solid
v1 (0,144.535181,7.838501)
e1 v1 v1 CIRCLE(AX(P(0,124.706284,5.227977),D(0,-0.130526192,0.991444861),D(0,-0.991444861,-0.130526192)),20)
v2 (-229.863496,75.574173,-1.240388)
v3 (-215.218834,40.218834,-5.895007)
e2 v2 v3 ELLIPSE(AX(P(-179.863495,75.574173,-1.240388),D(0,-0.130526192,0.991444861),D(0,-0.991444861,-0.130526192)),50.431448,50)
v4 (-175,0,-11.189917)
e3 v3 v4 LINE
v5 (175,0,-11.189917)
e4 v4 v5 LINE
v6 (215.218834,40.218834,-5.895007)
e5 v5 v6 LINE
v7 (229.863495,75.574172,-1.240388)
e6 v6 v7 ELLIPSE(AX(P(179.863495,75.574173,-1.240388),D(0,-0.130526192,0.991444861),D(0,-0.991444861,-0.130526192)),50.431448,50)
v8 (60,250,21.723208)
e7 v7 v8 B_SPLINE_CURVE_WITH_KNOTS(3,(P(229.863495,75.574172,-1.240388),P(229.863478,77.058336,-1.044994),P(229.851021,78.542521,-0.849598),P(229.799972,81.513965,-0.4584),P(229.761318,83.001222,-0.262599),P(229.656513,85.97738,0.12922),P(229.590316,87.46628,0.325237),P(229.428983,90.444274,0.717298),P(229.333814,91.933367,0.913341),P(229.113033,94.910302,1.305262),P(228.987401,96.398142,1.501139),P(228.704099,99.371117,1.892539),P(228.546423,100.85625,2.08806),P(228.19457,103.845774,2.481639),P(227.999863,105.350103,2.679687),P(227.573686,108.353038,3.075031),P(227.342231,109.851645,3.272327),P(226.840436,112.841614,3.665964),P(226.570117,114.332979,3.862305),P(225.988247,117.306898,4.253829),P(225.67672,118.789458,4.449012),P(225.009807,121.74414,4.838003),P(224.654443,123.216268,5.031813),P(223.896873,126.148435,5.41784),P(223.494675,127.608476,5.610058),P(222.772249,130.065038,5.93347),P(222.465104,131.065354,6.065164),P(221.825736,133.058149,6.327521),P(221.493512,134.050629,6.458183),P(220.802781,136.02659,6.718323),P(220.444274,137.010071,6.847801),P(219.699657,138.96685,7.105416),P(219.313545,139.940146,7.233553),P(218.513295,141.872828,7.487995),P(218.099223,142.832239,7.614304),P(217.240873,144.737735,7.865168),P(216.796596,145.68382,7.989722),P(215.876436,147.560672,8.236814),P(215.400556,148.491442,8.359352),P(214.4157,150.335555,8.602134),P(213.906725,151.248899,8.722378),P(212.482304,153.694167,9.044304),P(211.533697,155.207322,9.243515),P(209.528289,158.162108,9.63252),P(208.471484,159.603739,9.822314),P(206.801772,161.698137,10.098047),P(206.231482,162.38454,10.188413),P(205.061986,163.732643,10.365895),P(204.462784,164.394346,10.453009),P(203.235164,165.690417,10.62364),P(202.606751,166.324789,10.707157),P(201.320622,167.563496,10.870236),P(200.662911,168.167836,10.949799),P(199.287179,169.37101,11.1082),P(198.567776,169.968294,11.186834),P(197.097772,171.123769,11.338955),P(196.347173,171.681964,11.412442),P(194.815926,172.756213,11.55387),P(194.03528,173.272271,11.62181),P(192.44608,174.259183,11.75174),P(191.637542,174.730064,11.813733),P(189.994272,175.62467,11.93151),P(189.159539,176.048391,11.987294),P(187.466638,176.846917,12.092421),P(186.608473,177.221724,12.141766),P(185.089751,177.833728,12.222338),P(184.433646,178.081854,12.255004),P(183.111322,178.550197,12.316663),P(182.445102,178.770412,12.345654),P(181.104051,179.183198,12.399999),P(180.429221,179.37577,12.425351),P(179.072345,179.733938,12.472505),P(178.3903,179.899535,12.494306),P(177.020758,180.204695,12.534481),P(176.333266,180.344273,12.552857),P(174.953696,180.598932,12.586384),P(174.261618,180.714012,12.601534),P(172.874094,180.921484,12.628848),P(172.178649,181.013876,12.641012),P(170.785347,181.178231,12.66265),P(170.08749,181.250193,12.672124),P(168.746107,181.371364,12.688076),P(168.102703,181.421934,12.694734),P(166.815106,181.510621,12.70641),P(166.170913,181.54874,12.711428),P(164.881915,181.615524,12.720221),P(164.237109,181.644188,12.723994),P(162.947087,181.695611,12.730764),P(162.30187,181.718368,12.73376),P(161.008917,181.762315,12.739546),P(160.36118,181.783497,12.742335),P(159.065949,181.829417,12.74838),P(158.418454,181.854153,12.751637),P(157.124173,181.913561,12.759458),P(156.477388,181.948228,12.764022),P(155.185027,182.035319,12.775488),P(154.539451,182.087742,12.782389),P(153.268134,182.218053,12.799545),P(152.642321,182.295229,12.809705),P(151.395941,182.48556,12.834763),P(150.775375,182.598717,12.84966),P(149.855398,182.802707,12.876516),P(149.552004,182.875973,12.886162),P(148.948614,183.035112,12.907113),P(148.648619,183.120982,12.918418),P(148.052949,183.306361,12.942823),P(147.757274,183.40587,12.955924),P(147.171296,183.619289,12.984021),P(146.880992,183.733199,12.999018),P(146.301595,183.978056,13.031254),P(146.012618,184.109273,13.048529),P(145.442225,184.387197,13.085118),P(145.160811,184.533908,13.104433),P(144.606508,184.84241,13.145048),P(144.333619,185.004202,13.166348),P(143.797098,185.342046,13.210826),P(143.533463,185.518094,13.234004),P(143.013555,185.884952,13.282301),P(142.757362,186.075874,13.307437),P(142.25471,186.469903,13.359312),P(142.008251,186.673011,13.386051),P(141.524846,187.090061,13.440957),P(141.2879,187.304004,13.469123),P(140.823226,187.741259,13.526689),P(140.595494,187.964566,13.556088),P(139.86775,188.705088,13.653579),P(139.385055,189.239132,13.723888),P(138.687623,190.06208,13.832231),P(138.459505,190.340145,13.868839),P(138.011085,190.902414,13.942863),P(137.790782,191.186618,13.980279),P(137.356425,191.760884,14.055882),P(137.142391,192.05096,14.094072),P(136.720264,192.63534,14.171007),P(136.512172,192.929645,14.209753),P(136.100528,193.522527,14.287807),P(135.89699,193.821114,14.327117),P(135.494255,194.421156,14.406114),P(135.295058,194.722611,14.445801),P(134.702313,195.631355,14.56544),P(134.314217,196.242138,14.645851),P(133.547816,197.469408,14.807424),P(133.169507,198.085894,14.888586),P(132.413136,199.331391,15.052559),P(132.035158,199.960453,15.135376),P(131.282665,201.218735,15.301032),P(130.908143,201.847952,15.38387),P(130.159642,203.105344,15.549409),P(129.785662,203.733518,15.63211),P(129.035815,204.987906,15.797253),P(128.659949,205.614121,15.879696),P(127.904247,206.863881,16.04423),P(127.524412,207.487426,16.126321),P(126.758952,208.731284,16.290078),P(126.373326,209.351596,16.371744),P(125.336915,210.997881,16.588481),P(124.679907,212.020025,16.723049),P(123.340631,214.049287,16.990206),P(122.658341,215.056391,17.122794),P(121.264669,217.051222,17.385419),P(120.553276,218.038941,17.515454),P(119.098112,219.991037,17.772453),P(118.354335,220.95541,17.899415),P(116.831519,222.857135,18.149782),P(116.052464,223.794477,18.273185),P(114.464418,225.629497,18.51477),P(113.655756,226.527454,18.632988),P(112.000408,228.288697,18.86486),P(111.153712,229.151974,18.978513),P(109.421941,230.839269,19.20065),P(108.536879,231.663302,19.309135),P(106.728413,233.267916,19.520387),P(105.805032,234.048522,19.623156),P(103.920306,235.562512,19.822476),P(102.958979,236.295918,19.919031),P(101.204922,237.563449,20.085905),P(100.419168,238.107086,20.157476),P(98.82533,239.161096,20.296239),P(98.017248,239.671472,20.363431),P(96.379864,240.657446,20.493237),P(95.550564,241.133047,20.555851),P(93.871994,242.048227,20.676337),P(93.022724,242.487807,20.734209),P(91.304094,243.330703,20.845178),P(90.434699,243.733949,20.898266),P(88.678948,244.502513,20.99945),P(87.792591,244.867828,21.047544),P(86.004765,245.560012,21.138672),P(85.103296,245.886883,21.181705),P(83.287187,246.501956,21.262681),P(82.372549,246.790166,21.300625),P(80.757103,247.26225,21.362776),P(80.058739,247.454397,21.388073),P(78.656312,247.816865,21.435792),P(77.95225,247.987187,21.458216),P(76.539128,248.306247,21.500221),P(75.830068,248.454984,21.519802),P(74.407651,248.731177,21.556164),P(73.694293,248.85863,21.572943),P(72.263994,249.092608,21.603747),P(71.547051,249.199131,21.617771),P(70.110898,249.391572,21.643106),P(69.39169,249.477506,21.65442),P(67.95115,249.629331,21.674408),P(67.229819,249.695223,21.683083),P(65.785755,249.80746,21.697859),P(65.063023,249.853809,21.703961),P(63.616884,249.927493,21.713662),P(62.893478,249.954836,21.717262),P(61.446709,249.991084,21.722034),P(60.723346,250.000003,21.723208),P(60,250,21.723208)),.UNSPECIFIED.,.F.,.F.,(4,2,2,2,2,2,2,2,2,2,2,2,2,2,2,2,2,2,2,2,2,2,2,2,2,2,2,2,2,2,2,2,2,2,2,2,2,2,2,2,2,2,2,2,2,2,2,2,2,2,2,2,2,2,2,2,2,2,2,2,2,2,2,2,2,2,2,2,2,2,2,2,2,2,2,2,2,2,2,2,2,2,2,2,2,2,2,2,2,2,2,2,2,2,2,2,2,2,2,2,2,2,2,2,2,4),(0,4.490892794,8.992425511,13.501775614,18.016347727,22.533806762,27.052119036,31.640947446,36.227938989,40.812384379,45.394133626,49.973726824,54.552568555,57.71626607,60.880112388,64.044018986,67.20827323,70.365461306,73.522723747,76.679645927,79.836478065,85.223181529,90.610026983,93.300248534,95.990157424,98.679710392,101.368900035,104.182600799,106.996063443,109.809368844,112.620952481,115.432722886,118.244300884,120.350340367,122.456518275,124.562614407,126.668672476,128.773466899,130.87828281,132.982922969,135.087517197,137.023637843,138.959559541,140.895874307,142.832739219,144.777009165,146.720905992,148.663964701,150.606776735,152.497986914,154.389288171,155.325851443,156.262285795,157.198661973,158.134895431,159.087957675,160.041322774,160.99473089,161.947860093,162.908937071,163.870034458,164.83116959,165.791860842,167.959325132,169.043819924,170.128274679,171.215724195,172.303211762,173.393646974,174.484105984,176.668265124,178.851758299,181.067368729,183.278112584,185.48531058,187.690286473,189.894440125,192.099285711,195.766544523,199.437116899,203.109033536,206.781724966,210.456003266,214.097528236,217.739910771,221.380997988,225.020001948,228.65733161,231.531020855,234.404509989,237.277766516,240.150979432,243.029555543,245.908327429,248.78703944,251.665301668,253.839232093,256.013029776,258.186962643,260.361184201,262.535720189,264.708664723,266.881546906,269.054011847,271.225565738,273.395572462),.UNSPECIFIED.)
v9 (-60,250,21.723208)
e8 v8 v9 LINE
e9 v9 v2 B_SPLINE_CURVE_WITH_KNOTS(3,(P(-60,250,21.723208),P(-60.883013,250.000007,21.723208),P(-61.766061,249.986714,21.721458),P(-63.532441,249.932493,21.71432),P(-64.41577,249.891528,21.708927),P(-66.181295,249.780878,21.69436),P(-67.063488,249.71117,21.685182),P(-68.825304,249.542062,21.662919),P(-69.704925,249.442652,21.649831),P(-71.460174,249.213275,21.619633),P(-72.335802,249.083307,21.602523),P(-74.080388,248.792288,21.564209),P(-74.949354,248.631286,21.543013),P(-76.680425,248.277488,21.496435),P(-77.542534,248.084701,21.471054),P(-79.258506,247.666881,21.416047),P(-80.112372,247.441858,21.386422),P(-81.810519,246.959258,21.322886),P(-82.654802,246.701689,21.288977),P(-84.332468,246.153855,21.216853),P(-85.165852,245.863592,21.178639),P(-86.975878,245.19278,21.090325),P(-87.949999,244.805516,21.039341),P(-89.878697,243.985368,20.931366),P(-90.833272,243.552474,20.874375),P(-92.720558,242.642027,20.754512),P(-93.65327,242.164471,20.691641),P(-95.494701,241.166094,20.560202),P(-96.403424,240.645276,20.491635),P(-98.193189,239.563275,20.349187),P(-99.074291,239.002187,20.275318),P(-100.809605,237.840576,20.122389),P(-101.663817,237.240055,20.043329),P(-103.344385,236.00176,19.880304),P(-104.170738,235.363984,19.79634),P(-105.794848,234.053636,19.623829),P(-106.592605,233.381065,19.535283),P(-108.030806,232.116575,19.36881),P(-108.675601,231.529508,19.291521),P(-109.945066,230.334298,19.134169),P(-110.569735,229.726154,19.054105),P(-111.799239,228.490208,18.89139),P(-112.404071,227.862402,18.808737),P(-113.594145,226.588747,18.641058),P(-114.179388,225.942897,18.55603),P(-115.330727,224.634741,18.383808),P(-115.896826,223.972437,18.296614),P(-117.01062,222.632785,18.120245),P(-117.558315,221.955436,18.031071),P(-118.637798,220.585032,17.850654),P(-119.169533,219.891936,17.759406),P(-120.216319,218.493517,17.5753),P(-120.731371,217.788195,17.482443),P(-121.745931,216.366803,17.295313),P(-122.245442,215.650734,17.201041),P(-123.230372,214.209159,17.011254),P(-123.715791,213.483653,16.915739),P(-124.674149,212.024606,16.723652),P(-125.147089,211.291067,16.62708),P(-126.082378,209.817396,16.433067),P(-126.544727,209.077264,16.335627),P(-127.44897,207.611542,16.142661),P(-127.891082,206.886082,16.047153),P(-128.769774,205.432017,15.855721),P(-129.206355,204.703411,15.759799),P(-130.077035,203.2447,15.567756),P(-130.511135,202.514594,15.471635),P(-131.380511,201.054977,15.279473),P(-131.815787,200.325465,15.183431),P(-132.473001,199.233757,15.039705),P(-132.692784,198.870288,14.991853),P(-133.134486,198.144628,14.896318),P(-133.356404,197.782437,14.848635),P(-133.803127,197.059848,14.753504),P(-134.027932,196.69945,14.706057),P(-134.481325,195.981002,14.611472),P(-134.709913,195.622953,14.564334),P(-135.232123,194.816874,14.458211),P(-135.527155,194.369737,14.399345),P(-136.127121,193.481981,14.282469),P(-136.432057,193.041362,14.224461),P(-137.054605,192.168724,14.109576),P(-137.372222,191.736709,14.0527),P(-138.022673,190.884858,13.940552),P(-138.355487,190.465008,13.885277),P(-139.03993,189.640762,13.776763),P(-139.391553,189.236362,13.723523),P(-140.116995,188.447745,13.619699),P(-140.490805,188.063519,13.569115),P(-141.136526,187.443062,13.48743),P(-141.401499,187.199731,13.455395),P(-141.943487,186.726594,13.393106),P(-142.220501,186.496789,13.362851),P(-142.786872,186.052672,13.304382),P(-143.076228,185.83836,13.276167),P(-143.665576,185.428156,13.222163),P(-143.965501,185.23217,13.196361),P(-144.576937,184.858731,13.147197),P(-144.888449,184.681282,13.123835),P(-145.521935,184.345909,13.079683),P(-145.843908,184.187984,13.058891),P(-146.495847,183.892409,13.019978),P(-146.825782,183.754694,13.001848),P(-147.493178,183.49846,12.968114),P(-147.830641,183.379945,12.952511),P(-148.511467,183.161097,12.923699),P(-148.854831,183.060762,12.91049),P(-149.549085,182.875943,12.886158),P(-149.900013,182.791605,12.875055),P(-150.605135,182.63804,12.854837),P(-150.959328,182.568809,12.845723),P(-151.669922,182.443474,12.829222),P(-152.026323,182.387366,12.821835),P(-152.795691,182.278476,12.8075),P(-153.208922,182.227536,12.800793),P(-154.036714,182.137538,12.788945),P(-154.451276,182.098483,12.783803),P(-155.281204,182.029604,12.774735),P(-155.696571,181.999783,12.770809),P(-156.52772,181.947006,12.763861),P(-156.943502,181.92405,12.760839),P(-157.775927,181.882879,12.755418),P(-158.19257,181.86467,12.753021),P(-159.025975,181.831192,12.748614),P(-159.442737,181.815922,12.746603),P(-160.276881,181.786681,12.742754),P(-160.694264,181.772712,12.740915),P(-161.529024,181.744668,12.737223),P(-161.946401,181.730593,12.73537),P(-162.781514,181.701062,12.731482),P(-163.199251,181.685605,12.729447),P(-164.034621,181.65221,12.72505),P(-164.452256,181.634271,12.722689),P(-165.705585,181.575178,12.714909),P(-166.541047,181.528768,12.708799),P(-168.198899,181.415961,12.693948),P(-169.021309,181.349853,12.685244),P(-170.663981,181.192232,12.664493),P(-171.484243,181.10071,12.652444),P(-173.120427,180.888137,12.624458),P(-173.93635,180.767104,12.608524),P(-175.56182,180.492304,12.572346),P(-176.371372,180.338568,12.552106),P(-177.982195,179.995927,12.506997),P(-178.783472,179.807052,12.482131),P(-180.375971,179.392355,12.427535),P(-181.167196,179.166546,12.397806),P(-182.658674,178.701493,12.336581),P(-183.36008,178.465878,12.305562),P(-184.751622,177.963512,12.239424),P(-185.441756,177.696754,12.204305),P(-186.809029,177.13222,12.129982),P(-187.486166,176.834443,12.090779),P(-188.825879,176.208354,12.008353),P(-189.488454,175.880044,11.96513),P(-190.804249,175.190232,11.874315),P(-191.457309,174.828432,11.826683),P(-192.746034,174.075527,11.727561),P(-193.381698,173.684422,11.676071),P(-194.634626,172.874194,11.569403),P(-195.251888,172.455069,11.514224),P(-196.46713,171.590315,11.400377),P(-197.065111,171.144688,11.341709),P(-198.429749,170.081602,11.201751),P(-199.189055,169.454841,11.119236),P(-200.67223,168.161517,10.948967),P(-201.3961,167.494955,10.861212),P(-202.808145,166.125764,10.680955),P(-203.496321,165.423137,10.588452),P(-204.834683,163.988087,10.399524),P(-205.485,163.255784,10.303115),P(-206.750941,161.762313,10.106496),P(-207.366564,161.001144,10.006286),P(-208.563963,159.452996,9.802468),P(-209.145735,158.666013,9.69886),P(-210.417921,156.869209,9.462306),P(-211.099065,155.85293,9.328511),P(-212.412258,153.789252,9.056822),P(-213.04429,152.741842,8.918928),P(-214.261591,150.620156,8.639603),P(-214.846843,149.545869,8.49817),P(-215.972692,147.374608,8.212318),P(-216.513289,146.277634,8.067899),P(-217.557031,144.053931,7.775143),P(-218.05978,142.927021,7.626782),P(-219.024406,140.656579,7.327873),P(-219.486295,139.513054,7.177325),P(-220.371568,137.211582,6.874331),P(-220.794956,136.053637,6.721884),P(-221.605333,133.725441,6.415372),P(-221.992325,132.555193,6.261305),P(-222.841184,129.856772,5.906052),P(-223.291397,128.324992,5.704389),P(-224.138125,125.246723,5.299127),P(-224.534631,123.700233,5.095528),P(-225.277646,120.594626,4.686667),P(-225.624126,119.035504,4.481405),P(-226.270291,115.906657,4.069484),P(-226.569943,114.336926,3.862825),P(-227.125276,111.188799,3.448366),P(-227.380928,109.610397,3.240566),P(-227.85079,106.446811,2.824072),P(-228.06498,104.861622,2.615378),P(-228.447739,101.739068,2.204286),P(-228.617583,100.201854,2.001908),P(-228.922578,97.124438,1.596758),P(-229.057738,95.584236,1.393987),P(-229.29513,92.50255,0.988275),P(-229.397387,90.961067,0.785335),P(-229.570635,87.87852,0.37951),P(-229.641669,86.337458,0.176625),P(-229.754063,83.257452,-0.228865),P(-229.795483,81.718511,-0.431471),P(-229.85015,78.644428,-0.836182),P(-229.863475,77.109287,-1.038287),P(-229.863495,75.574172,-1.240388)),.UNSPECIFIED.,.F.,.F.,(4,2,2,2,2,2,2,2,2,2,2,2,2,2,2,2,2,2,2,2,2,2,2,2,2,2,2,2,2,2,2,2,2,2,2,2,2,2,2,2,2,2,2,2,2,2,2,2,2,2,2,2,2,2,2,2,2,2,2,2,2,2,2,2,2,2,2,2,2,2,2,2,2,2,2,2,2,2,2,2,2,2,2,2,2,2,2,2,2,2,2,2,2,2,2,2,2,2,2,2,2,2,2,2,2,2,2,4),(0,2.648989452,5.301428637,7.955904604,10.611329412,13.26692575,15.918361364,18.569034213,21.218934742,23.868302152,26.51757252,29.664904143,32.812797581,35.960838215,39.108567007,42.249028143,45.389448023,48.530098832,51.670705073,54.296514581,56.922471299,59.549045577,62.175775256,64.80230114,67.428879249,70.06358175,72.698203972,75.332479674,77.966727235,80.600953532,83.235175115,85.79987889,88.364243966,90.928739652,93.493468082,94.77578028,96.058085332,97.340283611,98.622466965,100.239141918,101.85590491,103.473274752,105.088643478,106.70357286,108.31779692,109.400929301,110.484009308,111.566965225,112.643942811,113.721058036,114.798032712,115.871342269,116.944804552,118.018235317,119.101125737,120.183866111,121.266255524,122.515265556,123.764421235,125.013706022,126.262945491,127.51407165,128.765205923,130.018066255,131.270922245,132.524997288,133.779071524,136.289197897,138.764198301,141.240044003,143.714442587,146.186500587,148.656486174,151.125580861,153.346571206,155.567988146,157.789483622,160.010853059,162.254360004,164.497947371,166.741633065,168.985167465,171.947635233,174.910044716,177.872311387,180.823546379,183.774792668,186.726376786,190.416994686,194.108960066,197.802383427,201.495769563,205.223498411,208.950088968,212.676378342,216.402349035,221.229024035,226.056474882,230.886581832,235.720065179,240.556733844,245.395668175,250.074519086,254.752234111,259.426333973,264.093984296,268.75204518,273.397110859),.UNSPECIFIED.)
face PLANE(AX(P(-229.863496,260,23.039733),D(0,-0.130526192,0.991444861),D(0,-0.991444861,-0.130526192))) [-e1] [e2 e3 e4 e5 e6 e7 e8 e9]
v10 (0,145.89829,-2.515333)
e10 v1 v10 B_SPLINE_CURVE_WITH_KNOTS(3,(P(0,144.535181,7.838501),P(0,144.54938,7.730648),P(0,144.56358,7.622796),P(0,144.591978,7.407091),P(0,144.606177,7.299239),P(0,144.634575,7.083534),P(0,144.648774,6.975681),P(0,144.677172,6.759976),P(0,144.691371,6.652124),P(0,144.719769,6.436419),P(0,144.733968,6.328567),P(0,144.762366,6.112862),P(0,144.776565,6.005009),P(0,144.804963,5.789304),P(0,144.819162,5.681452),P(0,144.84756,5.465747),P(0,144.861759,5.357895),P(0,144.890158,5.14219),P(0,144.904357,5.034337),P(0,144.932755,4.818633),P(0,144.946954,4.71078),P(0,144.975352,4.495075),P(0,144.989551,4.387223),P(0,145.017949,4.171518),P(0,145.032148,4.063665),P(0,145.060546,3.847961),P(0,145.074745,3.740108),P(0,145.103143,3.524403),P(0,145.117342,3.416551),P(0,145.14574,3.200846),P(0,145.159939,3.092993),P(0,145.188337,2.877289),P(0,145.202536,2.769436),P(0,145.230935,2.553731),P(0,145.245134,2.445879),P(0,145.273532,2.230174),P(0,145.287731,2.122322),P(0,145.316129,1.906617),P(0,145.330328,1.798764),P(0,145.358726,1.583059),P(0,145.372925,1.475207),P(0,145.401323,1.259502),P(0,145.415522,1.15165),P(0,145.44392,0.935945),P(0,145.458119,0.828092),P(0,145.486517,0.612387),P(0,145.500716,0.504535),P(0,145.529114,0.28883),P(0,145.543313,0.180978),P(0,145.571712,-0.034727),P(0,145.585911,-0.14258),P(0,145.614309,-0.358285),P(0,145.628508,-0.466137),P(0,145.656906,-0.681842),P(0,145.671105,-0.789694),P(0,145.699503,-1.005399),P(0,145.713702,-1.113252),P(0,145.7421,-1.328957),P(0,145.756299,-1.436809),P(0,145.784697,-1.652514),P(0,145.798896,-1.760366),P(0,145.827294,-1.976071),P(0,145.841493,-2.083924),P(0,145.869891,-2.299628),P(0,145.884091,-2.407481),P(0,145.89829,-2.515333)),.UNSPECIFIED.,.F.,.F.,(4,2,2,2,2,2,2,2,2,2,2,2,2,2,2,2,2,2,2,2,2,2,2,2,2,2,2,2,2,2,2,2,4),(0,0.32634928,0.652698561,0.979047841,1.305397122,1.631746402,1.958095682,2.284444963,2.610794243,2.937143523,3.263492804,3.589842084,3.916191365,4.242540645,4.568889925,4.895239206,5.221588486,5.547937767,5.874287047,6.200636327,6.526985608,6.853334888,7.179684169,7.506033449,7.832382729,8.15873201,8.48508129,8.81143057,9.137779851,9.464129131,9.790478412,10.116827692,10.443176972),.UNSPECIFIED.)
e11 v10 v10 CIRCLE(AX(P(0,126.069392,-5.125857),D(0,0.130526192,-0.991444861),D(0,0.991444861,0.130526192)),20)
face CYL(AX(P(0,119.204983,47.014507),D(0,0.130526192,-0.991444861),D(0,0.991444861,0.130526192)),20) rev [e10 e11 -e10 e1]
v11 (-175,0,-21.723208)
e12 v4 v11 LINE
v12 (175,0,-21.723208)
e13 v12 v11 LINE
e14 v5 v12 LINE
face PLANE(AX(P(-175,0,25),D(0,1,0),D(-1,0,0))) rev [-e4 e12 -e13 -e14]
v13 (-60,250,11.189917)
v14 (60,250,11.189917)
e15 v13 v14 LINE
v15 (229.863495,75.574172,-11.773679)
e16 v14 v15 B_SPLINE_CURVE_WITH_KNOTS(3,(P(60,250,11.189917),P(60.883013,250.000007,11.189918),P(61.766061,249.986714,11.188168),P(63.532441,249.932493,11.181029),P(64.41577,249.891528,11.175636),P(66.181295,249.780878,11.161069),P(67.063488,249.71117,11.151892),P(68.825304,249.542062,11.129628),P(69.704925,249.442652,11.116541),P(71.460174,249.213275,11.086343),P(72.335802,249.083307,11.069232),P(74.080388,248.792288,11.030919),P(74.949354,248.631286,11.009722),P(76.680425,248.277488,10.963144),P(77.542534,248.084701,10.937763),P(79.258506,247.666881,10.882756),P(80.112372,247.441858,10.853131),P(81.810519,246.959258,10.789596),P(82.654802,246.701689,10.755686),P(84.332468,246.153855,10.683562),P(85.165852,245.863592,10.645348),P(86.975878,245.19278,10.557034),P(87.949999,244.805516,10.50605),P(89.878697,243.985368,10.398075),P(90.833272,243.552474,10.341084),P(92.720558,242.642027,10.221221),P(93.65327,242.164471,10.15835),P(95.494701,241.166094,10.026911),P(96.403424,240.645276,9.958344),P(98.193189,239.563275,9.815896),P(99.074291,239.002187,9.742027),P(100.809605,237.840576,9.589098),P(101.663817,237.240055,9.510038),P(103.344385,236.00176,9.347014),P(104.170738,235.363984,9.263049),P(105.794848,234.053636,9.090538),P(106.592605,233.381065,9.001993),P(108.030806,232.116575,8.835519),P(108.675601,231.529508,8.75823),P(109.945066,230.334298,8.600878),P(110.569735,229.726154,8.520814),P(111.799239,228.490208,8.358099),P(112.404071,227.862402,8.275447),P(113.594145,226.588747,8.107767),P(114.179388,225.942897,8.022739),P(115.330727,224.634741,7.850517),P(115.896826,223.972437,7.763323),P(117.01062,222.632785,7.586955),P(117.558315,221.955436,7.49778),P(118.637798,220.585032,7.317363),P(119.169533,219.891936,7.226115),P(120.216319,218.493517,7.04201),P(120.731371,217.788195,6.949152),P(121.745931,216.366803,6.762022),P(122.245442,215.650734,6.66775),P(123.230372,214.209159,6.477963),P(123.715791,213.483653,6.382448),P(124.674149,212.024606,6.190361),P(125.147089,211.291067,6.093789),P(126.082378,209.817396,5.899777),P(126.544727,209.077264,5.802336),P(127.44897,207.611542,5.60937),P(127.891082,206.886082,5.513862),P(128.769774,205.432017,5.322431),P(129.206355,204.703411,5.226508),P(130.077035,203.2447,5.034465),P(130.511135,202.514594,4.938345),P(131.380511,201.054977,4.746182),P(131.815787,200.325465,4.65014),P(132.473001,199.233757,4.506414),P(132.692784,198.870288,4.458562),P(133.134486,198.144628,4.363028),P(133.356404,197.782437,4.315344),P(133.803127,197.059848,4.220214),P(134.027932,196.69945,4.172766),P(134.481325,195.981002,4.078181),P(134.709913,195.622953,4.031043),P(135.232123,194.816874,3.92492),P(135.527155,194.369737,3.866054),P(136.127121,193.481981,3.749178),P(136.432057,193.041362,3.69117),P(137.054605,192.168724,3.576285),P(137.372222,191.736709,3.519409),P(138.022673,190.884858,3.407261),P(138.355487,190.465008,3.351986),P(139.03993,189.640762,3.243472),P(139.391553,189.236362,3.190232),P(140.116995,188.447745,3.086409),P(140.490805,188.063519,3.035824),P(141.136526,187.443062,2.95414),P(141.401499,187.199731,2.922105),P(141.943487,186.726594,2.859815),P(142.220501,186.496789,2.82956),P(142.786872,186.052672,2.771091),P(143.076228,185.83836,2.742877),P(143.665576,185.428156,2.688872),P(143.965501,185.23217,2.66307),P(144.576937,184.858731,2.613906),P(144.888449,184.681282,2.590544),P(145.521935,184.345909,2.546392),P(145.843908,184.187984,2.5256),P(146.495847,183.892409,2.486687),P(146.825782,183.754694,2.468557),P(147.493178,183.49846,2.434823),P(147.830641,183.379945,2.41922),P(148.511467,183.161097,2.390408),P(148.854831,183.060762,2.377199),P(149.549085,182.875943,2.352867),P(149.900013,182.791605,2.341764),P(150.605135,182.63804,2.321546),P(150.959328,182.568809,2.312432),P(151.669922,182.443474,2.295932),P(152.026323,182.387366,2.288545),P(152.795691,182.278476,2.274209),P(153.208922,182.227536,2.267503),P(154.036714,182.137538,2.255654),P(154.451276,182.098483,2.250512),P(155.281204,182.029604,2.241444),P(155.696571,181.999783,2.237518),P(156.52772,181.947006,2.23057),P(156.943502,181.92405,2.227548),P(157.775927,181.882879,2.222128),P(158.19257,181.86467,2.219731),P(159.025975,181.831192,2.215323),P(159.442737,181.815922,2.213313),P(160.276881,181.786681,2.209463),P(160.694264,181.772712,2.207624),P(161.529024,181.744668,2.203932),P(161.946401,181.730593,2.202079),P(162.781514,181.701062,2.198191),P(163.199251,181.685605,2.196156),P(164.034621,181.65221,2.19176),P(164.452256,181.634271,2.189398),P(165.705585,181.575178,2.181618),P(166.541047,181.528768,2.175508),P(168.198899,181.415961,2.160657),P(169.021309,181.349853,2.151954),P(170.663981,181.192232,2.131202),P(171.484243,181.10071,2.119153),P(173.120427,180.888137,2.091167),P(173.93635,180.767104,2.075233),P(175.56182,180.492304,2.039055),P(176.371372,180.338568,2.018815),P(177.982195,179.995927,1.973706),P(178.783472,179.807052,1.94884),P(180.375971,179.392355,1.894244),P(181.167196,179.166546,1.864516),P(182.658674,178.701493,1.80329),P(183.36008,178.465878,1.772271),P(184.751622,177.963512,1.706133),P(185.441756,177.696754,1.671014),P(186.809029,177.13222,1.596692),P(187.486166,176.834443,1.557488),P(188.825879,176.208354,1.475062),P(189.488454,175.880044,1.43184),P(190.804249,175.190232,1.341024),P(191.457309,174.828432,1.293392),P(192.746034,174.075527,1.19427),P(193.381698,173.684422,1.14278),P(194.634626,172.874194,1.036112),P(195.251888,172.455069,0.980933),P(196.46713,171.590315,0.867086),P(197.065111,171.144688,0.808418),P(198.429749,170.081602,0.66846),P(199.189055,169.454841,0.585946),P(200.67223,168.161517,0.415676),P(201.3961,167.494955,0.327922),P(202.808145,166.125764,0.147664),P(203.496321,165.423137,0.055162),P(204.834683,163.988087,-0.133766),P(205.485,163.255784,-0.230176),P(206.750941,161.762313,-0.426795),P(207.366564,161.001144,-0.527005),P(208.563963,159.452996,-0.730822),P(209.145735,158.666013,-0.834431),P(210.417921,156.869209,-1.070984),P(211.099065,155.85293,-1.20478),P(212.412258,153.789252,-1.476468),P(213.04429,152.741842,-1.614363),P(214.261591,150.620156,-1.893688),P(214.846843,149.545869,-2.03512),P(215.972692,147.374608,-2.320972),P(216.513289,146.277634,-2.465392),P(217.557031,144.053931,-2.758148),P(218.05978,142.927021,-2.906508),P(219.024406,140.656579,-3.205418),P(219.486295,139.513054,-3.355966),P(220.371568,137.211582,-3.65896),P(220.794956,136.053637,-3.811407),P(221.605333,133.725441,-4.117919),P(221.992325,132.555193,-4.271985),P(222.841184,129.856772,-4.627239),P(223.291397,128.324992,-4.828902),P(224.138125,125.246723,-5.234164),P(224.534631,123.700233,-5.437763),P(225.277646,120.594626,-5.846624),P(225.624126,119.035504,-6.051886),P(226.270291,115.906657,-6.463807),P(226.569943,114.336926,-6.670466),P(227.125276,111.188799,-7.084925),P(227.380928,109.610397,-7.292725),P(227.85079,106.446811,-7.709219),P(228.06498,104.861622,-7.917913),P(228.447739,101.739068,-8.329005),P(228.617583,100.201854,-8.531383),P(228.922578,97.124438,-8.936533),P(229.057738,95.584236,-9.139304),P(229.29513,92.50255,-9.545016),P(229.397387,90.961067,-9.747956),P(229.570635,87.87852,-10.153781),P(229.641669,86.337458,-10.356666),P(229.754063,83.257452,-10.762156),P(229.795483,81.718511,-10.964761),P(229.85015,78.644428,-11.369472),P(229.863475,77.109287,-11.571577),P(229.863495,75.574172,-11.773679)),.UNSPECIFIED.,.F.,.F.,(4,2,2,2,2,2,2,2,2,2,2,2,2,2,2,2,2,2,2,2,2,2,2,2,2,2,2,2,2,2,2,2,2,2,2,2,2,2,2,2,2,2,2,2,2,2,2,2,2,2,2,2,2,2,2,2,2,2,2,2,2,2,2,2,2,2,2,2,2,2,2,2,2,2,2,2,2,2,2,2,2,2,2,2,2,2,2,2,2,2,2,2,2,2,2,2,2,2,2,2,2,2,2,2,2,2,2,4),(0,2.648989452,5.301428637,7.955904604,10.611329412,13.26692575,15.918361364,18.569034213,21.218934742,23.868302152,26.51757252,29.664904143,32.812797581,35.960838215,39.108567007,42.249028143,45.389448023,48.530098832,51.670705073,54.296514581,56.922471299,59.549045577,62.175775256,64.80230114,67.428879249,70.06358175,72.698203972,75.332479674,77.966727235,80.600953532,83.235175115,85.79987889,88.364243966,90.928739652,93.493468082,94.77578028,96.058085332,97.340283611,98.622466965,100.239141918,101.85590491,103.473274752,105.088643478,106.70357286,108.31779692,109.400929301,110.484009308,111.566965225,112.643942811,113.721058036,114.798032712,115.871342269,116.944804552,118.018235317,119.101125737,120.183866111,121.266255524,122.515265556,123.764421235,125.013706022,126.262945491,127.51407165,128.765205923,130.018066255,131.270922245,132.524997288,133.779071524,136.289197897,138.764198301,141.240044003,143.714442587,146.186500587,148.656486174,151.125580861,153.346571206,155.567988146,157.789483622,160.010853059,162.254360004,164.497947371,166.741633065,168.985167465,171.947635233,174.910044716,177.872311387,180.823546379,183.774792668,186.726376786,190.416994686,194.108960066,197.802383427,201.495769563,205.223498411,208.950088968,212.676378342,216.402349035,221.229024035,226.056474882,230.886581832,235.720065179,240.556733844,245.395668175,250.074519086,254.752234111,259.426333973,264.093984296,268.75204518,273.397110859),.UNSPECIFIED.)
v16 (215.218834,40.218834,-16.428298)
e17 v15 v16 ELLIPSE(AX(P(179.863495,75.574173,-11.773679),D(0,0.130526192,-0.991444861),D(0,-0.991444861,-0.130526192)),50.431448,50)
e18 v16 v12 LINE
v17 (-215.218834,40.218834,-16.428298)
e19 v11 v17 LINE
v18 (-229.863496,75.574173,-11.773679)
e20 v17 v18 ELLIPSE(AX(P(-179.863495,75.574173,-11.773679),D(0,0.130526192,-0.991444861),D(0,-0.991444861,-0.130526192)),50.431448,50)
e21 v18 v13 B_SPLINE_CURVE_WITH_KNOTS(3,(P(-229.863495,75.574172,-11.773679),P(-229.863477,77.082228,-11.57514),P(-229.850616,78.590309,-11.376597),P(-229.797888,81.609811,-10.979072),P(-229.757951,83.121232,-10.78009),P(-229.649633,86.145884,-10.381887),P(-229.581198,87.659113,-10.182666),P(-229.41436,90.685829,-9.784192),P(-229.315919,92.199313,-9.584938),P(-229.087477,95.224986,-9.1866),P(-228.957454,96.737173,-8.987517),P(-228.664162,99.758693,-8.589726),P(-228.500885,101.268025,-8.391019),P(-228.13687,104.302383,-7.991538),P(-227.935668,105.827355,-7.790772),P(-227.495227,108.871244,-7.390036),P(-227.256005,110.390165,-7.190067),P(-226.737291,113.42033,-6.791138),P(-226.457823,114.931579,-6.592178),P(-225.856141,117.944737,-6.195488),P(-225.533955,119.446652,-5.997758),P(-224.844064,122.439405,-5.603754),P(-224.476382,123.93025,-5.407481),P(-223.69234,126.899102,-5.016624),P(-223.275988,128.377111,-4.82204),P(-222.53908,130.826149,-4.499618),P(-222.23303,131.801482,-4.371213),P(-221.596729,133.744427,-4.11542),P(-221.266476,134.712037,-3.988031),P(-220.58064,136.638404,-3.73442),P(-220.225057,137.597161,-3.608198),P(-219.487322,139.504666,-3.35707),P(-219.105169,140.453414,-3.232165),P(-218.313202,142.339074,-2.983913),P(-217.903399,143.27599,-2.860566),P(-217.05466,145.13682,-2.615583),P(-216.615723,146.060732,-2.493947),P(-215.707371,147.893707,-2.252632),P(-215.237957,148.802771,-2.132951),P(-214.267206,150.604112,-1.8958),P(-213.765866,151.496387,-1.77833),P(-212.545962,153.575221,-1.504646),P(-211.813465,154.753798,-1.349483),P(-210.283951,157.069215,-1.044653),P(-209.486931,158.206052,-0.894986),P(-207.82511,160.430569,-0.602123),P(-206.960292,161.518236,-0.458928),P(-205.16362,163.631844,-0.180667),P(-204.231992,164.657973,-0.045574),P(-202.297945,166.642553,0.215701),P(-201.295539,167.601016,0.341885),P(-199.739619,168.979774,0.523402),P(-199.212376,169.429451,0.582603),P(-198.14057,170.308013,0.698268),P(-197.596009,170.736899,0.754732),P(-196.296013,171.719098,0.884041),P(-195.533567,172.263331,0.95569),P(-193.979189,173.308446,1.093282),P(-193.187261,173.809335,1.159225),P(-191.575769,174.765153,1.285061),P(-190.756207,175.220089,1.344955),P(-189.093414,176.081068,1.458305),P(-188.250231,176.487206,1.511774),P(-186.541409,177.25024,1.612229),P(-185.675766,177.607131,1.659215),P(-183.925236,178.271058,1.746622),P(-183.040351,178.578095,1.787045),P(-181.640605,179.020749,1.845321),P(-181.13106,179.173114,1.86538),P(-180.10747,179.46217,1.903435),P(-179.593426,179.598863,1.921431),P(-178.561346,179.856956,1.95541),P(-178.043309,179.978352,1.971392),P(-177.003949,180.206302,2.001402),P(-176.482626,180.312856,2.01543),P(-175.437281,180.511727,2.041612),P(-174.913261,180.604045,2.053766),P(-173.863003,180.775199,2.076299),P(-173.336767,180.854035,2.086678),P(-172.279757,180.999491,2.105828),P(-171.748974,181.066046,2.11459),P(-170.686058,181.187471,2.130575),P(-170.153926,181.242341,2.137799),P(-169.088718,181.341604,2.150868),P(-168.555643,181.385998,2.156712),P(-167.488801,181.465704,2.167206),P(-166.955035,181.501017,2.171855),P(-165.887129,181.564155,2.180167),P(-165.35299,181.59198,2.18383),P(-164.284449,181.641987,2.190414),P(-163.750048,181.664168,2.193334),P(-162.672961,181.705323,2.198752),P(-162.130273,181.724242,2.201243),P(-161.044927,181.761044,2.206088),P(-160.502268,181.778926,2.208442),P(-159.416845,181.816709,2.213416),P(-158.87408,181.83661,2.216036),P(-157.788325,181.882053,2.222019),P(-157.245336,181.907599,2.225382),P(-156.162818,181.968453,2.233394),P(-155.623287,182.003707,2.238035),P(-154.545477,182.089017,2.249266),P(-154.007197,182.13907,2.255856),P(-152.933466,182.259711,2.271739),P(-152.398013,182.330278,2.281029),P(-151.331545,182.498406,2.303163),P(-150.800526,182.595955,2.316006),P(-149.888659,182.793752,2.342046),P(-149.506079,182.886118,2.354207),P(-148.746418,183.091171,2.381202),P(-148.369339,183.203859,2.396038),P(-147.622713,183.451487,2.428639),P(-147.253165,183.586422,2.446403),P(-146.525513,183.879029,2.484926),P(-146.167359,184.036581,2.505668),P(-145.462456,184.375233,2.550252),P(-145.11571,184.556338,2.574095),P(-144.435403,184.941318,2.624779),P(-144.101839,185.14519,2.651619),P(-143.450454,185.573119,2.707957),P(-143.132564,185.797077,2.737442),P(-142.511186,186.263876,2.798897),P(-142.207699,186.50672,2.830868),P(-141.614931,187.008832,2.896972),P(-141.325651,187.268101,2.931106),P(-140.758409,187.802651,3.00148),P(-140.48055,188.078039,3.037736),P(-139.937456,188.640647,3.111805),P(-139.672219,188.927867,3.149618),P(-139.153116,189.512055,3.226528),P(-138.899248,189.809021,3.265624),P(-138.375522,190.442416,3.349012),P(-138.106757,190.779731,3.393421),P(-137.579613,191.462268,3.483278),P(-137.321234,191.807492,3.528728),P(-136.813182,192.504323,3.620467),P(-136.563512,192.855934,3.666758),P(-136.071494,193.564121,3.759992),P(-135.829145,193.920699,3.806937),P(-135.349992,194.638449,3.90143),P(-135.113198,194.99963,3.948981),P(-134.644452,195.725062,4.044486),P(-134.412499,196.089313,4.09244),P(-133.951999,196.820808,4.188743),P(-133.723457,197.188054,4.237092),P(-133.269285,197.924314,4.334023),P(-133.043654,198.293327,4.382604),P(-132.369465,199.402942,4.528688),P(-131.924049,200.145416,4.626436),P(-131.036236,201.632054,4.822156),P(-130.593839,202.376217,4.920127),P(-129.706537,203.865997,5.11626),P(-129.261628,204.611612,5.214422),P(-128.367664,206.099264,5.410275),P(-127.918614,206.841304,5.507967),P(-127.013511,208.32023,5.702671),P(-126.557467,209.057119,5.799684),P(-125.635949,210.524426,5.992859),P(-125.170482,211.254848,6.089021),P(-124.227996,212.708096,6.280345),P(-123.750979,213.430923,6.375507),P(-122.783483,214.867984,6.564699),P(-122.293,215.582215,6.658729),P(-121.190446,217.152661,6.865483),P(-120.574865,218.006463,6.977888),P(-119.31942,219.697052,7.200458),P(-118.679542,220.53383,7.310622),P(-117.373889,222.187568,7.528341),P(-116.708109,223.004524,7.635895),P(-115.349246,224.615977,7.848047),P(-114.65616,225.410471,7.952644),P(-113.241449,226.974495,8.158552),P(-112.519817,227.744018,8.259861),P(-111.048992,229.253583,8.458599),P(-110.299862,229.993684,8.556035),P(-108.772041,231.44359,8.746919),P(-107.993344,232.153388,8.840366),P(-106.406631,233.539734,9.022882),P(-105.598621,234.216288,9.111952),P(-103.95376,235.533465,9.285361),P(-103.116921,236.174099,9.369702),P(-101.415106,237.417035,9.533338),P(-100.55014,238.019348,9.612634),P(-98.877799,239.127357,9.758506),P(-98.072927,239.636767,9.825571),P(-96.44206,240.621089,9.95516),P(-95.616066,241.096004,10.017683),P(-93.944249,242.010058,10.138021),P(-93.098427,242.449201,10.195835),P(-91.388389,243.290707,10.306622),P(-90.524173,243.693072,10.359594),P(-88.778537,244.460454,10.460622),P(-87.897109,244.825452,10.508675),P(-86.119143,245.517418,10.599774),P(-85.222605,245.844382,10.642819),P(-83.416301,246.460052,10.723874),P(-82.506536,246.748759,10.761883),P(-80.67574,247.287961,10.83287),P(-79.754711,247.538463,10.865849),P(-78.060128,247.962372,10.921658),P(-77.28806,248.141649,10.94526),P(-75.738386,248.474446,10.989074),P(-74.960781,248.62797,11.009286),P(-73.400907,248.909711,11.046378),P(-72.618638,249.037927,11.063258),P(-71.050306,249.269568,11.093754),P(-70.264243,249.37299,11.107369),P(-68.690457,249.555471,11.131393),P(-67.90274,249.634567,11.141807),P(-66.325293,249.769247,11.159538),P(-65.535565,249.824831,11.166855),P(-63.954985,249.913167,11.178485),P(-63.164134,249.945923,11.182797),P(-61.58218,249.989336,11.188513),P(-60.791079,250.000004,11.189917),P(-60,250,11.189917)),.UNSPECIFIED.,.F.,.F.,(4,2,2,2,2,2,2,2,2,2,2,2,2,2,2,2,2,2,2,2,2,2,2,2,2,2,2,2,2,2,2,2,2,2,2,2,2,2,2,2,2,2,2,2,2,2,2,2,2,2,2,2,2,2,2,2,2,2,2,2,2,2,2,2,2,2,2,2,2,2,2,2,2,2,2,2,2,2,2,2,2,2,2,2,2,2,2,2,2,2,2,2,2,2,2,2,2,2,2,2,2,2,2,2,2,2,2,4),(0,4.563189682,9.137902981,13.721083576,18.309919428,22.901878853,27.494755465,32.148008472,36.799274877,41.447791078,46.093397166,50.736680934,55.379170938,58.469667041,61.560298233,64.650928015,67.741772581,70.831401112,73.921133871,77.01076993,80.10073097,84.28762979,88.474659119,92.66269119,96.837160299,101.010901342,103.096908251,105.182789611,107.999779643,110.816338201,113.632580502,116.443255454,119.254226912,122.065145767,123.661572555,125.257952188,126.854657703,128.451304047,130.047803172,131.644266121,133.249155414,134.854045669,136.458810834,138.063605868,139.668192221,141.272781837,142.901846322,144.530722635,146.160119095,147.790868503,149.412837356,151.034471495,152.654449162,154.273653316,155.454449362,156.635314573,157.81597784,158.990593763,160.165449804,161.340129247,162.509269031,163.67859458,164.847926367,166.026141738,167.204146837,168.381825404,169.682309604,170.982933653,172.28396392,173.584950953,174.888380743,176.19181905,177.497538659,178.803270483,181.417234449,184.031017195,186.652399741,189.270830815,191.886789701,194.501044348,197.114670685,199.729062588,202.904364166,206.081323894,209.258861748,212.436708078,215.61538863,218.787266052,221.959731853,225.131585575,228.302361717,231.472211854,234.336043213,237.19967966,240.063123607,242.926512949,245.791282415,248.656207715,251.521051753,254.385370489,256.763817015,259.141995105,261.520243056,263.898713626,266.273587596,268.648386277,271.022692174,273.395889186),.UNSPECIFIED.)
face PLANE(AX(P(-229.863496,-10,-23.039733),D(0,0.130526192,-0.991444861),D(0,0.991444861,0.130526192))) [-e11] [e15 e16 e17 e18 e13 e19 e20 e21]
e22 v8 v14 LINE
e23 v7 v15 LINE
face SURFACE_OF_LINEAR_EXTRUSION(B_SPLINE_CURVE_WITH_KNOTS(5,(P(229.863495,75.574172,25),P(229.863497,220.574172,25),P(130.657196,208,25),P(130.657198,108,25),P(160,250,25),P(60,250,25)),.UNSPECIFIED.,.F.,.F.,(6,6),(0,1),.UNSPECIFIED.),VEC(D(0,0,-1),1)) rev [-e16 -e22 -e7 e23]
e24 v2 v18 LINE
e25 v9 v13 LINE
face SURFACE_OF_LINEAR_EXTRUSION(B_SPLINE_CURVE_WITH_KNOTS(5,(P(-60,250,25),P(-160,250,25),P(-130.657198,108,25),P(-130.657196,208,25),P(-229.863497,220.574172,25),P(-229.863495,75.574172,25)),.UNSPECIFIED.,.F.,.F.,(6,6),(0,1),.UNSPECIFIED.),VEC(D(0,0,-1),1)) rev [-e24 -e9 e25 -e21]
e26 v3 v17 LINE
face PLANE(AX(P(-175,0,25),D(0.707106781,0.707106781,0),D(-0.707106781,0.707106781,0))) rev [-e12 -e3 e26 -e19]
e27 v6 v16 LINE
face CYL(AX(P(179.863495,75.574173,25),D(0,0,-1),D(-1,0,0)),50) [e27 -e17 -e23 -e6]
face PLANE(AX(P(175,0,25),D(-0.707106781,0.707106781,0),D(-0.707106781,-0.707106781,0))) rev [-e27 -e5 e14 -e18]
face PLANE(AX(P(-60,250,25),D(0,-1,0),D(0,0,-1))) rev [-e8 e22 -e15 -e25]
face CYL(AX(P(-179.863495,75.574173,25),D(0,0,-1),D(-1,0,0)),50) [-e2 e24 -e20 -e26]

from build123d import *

# Parameters (mm, degrees)
BOSS_EXTRUDE1_START     = -25
BOSS_EXTRUDE1_DEPTH     = 50
CUT_EXTRUDE1_DEPTH      = 341.53226913
CUT_EXTRUDE1_DEPTH_BACK = 341.53226913
CUT_EXTRUDE2_DEPTH      = 341.286795308
CUT_EXTRUDE2_DEPTH_BACK = 341.286795308
SKETCH4_R               = 20


# Read off the part's stored shape, not the designer's step: Boss-Extrude1
with BuildPart() as part:
    # Boss-Extrude1 outline → Boss-Extrude1 (new body)
    with BuildSketch(Plane.XY.offset(BOSS_EXTRUDE1_START)):
        with BuildLine():
            Line((175, 0), (215.218833807, 40.218833807))
            ThreePointArc((215.218833807, 40.218833807), (226.057471223, 56.440000887), (229.863494748, 75.574172084))
            add(Edge.make_bspline(
                [(229.863494748, 75.574172084), (229.863497015, 220.574172084), (130.657195822, 208), (130.657198498, 108), (160, 250), (60, 250)],
                knots=[0, 0, 0, 0, 0, 0, 1, 1, 1, 1, 1, 1], degree=5))
            Line((60, 250), (-60, 250))
            add(Edge.make_bspline(
                [(-60, 250), (-160, 250), (-130.657198498, 108), (-130.657195822, 208), (-229.863497015, 220.574172084), (-229.863494748, 75.574172084)],
                knots=[0, 0, 0, 0, 0, 0, 1, 1, 1, 1, 1, 1], degree=5))
            ThreePointArc((-229.863494748, 75.574172084), (-226.057471223, 56.440000887), (-215.218833807, 40.218833807))
            Line((-215.218833807, 40.218833807), (-175, 0))
            Line((-175, 0), (175, 0))
        make_face()
    extrude(amount=BOSS_EXTRUDE1_DEPTH)

    # Sketch2 → Cut-Extrude1 (cut, two sides: drawn at the far end of the back side and taken through both)
    with BuildSketch(Plane(origin=(0, 0, 0), x_dir=(0, 0, -1), z_dir=(1, 0, 0)).offset(-CUT_EXTRUDE1_DEPTH_BACK)):
        Polygon((23.039732542, -10), (-12.506441807, 260), (35, 260), (35, -10), align=None)
        Polygon((-23.039732542, 260), (12.506441807, -10), (-35, -10), (-35, 260), align=None)
    extrude(amount=CUT_EXTRUDE1_DEPTH + CUT_EXTRUDE1_DEPTH_BACK, mode=Mode.SUBTRACT)

    # Sketch4 → Cut-Extrude2 (cut, two sides: drawn at the far end of the back side and taken through both)
    with BuildSketch(Plane(origin=(0, 2.811189919, -21.353107392), x_dir=(-1, 0, 0), z_dir=(0, 0.13052619222005532, -0.99144486137381)).offset(-CUT_EXTRUDE2_DEPTH_BACK)):
        with Locations(Location((0, 124.321792579, 0), (0, 0, 90))):
            Circle(SKETCH4_R)
    extrude(amount=CUT_EXTRUDE2_DEPTH + CUT_EXTRUDE2_DEPTH_BACK, mode=Mode.SUBTRACT)


solid = part.part
